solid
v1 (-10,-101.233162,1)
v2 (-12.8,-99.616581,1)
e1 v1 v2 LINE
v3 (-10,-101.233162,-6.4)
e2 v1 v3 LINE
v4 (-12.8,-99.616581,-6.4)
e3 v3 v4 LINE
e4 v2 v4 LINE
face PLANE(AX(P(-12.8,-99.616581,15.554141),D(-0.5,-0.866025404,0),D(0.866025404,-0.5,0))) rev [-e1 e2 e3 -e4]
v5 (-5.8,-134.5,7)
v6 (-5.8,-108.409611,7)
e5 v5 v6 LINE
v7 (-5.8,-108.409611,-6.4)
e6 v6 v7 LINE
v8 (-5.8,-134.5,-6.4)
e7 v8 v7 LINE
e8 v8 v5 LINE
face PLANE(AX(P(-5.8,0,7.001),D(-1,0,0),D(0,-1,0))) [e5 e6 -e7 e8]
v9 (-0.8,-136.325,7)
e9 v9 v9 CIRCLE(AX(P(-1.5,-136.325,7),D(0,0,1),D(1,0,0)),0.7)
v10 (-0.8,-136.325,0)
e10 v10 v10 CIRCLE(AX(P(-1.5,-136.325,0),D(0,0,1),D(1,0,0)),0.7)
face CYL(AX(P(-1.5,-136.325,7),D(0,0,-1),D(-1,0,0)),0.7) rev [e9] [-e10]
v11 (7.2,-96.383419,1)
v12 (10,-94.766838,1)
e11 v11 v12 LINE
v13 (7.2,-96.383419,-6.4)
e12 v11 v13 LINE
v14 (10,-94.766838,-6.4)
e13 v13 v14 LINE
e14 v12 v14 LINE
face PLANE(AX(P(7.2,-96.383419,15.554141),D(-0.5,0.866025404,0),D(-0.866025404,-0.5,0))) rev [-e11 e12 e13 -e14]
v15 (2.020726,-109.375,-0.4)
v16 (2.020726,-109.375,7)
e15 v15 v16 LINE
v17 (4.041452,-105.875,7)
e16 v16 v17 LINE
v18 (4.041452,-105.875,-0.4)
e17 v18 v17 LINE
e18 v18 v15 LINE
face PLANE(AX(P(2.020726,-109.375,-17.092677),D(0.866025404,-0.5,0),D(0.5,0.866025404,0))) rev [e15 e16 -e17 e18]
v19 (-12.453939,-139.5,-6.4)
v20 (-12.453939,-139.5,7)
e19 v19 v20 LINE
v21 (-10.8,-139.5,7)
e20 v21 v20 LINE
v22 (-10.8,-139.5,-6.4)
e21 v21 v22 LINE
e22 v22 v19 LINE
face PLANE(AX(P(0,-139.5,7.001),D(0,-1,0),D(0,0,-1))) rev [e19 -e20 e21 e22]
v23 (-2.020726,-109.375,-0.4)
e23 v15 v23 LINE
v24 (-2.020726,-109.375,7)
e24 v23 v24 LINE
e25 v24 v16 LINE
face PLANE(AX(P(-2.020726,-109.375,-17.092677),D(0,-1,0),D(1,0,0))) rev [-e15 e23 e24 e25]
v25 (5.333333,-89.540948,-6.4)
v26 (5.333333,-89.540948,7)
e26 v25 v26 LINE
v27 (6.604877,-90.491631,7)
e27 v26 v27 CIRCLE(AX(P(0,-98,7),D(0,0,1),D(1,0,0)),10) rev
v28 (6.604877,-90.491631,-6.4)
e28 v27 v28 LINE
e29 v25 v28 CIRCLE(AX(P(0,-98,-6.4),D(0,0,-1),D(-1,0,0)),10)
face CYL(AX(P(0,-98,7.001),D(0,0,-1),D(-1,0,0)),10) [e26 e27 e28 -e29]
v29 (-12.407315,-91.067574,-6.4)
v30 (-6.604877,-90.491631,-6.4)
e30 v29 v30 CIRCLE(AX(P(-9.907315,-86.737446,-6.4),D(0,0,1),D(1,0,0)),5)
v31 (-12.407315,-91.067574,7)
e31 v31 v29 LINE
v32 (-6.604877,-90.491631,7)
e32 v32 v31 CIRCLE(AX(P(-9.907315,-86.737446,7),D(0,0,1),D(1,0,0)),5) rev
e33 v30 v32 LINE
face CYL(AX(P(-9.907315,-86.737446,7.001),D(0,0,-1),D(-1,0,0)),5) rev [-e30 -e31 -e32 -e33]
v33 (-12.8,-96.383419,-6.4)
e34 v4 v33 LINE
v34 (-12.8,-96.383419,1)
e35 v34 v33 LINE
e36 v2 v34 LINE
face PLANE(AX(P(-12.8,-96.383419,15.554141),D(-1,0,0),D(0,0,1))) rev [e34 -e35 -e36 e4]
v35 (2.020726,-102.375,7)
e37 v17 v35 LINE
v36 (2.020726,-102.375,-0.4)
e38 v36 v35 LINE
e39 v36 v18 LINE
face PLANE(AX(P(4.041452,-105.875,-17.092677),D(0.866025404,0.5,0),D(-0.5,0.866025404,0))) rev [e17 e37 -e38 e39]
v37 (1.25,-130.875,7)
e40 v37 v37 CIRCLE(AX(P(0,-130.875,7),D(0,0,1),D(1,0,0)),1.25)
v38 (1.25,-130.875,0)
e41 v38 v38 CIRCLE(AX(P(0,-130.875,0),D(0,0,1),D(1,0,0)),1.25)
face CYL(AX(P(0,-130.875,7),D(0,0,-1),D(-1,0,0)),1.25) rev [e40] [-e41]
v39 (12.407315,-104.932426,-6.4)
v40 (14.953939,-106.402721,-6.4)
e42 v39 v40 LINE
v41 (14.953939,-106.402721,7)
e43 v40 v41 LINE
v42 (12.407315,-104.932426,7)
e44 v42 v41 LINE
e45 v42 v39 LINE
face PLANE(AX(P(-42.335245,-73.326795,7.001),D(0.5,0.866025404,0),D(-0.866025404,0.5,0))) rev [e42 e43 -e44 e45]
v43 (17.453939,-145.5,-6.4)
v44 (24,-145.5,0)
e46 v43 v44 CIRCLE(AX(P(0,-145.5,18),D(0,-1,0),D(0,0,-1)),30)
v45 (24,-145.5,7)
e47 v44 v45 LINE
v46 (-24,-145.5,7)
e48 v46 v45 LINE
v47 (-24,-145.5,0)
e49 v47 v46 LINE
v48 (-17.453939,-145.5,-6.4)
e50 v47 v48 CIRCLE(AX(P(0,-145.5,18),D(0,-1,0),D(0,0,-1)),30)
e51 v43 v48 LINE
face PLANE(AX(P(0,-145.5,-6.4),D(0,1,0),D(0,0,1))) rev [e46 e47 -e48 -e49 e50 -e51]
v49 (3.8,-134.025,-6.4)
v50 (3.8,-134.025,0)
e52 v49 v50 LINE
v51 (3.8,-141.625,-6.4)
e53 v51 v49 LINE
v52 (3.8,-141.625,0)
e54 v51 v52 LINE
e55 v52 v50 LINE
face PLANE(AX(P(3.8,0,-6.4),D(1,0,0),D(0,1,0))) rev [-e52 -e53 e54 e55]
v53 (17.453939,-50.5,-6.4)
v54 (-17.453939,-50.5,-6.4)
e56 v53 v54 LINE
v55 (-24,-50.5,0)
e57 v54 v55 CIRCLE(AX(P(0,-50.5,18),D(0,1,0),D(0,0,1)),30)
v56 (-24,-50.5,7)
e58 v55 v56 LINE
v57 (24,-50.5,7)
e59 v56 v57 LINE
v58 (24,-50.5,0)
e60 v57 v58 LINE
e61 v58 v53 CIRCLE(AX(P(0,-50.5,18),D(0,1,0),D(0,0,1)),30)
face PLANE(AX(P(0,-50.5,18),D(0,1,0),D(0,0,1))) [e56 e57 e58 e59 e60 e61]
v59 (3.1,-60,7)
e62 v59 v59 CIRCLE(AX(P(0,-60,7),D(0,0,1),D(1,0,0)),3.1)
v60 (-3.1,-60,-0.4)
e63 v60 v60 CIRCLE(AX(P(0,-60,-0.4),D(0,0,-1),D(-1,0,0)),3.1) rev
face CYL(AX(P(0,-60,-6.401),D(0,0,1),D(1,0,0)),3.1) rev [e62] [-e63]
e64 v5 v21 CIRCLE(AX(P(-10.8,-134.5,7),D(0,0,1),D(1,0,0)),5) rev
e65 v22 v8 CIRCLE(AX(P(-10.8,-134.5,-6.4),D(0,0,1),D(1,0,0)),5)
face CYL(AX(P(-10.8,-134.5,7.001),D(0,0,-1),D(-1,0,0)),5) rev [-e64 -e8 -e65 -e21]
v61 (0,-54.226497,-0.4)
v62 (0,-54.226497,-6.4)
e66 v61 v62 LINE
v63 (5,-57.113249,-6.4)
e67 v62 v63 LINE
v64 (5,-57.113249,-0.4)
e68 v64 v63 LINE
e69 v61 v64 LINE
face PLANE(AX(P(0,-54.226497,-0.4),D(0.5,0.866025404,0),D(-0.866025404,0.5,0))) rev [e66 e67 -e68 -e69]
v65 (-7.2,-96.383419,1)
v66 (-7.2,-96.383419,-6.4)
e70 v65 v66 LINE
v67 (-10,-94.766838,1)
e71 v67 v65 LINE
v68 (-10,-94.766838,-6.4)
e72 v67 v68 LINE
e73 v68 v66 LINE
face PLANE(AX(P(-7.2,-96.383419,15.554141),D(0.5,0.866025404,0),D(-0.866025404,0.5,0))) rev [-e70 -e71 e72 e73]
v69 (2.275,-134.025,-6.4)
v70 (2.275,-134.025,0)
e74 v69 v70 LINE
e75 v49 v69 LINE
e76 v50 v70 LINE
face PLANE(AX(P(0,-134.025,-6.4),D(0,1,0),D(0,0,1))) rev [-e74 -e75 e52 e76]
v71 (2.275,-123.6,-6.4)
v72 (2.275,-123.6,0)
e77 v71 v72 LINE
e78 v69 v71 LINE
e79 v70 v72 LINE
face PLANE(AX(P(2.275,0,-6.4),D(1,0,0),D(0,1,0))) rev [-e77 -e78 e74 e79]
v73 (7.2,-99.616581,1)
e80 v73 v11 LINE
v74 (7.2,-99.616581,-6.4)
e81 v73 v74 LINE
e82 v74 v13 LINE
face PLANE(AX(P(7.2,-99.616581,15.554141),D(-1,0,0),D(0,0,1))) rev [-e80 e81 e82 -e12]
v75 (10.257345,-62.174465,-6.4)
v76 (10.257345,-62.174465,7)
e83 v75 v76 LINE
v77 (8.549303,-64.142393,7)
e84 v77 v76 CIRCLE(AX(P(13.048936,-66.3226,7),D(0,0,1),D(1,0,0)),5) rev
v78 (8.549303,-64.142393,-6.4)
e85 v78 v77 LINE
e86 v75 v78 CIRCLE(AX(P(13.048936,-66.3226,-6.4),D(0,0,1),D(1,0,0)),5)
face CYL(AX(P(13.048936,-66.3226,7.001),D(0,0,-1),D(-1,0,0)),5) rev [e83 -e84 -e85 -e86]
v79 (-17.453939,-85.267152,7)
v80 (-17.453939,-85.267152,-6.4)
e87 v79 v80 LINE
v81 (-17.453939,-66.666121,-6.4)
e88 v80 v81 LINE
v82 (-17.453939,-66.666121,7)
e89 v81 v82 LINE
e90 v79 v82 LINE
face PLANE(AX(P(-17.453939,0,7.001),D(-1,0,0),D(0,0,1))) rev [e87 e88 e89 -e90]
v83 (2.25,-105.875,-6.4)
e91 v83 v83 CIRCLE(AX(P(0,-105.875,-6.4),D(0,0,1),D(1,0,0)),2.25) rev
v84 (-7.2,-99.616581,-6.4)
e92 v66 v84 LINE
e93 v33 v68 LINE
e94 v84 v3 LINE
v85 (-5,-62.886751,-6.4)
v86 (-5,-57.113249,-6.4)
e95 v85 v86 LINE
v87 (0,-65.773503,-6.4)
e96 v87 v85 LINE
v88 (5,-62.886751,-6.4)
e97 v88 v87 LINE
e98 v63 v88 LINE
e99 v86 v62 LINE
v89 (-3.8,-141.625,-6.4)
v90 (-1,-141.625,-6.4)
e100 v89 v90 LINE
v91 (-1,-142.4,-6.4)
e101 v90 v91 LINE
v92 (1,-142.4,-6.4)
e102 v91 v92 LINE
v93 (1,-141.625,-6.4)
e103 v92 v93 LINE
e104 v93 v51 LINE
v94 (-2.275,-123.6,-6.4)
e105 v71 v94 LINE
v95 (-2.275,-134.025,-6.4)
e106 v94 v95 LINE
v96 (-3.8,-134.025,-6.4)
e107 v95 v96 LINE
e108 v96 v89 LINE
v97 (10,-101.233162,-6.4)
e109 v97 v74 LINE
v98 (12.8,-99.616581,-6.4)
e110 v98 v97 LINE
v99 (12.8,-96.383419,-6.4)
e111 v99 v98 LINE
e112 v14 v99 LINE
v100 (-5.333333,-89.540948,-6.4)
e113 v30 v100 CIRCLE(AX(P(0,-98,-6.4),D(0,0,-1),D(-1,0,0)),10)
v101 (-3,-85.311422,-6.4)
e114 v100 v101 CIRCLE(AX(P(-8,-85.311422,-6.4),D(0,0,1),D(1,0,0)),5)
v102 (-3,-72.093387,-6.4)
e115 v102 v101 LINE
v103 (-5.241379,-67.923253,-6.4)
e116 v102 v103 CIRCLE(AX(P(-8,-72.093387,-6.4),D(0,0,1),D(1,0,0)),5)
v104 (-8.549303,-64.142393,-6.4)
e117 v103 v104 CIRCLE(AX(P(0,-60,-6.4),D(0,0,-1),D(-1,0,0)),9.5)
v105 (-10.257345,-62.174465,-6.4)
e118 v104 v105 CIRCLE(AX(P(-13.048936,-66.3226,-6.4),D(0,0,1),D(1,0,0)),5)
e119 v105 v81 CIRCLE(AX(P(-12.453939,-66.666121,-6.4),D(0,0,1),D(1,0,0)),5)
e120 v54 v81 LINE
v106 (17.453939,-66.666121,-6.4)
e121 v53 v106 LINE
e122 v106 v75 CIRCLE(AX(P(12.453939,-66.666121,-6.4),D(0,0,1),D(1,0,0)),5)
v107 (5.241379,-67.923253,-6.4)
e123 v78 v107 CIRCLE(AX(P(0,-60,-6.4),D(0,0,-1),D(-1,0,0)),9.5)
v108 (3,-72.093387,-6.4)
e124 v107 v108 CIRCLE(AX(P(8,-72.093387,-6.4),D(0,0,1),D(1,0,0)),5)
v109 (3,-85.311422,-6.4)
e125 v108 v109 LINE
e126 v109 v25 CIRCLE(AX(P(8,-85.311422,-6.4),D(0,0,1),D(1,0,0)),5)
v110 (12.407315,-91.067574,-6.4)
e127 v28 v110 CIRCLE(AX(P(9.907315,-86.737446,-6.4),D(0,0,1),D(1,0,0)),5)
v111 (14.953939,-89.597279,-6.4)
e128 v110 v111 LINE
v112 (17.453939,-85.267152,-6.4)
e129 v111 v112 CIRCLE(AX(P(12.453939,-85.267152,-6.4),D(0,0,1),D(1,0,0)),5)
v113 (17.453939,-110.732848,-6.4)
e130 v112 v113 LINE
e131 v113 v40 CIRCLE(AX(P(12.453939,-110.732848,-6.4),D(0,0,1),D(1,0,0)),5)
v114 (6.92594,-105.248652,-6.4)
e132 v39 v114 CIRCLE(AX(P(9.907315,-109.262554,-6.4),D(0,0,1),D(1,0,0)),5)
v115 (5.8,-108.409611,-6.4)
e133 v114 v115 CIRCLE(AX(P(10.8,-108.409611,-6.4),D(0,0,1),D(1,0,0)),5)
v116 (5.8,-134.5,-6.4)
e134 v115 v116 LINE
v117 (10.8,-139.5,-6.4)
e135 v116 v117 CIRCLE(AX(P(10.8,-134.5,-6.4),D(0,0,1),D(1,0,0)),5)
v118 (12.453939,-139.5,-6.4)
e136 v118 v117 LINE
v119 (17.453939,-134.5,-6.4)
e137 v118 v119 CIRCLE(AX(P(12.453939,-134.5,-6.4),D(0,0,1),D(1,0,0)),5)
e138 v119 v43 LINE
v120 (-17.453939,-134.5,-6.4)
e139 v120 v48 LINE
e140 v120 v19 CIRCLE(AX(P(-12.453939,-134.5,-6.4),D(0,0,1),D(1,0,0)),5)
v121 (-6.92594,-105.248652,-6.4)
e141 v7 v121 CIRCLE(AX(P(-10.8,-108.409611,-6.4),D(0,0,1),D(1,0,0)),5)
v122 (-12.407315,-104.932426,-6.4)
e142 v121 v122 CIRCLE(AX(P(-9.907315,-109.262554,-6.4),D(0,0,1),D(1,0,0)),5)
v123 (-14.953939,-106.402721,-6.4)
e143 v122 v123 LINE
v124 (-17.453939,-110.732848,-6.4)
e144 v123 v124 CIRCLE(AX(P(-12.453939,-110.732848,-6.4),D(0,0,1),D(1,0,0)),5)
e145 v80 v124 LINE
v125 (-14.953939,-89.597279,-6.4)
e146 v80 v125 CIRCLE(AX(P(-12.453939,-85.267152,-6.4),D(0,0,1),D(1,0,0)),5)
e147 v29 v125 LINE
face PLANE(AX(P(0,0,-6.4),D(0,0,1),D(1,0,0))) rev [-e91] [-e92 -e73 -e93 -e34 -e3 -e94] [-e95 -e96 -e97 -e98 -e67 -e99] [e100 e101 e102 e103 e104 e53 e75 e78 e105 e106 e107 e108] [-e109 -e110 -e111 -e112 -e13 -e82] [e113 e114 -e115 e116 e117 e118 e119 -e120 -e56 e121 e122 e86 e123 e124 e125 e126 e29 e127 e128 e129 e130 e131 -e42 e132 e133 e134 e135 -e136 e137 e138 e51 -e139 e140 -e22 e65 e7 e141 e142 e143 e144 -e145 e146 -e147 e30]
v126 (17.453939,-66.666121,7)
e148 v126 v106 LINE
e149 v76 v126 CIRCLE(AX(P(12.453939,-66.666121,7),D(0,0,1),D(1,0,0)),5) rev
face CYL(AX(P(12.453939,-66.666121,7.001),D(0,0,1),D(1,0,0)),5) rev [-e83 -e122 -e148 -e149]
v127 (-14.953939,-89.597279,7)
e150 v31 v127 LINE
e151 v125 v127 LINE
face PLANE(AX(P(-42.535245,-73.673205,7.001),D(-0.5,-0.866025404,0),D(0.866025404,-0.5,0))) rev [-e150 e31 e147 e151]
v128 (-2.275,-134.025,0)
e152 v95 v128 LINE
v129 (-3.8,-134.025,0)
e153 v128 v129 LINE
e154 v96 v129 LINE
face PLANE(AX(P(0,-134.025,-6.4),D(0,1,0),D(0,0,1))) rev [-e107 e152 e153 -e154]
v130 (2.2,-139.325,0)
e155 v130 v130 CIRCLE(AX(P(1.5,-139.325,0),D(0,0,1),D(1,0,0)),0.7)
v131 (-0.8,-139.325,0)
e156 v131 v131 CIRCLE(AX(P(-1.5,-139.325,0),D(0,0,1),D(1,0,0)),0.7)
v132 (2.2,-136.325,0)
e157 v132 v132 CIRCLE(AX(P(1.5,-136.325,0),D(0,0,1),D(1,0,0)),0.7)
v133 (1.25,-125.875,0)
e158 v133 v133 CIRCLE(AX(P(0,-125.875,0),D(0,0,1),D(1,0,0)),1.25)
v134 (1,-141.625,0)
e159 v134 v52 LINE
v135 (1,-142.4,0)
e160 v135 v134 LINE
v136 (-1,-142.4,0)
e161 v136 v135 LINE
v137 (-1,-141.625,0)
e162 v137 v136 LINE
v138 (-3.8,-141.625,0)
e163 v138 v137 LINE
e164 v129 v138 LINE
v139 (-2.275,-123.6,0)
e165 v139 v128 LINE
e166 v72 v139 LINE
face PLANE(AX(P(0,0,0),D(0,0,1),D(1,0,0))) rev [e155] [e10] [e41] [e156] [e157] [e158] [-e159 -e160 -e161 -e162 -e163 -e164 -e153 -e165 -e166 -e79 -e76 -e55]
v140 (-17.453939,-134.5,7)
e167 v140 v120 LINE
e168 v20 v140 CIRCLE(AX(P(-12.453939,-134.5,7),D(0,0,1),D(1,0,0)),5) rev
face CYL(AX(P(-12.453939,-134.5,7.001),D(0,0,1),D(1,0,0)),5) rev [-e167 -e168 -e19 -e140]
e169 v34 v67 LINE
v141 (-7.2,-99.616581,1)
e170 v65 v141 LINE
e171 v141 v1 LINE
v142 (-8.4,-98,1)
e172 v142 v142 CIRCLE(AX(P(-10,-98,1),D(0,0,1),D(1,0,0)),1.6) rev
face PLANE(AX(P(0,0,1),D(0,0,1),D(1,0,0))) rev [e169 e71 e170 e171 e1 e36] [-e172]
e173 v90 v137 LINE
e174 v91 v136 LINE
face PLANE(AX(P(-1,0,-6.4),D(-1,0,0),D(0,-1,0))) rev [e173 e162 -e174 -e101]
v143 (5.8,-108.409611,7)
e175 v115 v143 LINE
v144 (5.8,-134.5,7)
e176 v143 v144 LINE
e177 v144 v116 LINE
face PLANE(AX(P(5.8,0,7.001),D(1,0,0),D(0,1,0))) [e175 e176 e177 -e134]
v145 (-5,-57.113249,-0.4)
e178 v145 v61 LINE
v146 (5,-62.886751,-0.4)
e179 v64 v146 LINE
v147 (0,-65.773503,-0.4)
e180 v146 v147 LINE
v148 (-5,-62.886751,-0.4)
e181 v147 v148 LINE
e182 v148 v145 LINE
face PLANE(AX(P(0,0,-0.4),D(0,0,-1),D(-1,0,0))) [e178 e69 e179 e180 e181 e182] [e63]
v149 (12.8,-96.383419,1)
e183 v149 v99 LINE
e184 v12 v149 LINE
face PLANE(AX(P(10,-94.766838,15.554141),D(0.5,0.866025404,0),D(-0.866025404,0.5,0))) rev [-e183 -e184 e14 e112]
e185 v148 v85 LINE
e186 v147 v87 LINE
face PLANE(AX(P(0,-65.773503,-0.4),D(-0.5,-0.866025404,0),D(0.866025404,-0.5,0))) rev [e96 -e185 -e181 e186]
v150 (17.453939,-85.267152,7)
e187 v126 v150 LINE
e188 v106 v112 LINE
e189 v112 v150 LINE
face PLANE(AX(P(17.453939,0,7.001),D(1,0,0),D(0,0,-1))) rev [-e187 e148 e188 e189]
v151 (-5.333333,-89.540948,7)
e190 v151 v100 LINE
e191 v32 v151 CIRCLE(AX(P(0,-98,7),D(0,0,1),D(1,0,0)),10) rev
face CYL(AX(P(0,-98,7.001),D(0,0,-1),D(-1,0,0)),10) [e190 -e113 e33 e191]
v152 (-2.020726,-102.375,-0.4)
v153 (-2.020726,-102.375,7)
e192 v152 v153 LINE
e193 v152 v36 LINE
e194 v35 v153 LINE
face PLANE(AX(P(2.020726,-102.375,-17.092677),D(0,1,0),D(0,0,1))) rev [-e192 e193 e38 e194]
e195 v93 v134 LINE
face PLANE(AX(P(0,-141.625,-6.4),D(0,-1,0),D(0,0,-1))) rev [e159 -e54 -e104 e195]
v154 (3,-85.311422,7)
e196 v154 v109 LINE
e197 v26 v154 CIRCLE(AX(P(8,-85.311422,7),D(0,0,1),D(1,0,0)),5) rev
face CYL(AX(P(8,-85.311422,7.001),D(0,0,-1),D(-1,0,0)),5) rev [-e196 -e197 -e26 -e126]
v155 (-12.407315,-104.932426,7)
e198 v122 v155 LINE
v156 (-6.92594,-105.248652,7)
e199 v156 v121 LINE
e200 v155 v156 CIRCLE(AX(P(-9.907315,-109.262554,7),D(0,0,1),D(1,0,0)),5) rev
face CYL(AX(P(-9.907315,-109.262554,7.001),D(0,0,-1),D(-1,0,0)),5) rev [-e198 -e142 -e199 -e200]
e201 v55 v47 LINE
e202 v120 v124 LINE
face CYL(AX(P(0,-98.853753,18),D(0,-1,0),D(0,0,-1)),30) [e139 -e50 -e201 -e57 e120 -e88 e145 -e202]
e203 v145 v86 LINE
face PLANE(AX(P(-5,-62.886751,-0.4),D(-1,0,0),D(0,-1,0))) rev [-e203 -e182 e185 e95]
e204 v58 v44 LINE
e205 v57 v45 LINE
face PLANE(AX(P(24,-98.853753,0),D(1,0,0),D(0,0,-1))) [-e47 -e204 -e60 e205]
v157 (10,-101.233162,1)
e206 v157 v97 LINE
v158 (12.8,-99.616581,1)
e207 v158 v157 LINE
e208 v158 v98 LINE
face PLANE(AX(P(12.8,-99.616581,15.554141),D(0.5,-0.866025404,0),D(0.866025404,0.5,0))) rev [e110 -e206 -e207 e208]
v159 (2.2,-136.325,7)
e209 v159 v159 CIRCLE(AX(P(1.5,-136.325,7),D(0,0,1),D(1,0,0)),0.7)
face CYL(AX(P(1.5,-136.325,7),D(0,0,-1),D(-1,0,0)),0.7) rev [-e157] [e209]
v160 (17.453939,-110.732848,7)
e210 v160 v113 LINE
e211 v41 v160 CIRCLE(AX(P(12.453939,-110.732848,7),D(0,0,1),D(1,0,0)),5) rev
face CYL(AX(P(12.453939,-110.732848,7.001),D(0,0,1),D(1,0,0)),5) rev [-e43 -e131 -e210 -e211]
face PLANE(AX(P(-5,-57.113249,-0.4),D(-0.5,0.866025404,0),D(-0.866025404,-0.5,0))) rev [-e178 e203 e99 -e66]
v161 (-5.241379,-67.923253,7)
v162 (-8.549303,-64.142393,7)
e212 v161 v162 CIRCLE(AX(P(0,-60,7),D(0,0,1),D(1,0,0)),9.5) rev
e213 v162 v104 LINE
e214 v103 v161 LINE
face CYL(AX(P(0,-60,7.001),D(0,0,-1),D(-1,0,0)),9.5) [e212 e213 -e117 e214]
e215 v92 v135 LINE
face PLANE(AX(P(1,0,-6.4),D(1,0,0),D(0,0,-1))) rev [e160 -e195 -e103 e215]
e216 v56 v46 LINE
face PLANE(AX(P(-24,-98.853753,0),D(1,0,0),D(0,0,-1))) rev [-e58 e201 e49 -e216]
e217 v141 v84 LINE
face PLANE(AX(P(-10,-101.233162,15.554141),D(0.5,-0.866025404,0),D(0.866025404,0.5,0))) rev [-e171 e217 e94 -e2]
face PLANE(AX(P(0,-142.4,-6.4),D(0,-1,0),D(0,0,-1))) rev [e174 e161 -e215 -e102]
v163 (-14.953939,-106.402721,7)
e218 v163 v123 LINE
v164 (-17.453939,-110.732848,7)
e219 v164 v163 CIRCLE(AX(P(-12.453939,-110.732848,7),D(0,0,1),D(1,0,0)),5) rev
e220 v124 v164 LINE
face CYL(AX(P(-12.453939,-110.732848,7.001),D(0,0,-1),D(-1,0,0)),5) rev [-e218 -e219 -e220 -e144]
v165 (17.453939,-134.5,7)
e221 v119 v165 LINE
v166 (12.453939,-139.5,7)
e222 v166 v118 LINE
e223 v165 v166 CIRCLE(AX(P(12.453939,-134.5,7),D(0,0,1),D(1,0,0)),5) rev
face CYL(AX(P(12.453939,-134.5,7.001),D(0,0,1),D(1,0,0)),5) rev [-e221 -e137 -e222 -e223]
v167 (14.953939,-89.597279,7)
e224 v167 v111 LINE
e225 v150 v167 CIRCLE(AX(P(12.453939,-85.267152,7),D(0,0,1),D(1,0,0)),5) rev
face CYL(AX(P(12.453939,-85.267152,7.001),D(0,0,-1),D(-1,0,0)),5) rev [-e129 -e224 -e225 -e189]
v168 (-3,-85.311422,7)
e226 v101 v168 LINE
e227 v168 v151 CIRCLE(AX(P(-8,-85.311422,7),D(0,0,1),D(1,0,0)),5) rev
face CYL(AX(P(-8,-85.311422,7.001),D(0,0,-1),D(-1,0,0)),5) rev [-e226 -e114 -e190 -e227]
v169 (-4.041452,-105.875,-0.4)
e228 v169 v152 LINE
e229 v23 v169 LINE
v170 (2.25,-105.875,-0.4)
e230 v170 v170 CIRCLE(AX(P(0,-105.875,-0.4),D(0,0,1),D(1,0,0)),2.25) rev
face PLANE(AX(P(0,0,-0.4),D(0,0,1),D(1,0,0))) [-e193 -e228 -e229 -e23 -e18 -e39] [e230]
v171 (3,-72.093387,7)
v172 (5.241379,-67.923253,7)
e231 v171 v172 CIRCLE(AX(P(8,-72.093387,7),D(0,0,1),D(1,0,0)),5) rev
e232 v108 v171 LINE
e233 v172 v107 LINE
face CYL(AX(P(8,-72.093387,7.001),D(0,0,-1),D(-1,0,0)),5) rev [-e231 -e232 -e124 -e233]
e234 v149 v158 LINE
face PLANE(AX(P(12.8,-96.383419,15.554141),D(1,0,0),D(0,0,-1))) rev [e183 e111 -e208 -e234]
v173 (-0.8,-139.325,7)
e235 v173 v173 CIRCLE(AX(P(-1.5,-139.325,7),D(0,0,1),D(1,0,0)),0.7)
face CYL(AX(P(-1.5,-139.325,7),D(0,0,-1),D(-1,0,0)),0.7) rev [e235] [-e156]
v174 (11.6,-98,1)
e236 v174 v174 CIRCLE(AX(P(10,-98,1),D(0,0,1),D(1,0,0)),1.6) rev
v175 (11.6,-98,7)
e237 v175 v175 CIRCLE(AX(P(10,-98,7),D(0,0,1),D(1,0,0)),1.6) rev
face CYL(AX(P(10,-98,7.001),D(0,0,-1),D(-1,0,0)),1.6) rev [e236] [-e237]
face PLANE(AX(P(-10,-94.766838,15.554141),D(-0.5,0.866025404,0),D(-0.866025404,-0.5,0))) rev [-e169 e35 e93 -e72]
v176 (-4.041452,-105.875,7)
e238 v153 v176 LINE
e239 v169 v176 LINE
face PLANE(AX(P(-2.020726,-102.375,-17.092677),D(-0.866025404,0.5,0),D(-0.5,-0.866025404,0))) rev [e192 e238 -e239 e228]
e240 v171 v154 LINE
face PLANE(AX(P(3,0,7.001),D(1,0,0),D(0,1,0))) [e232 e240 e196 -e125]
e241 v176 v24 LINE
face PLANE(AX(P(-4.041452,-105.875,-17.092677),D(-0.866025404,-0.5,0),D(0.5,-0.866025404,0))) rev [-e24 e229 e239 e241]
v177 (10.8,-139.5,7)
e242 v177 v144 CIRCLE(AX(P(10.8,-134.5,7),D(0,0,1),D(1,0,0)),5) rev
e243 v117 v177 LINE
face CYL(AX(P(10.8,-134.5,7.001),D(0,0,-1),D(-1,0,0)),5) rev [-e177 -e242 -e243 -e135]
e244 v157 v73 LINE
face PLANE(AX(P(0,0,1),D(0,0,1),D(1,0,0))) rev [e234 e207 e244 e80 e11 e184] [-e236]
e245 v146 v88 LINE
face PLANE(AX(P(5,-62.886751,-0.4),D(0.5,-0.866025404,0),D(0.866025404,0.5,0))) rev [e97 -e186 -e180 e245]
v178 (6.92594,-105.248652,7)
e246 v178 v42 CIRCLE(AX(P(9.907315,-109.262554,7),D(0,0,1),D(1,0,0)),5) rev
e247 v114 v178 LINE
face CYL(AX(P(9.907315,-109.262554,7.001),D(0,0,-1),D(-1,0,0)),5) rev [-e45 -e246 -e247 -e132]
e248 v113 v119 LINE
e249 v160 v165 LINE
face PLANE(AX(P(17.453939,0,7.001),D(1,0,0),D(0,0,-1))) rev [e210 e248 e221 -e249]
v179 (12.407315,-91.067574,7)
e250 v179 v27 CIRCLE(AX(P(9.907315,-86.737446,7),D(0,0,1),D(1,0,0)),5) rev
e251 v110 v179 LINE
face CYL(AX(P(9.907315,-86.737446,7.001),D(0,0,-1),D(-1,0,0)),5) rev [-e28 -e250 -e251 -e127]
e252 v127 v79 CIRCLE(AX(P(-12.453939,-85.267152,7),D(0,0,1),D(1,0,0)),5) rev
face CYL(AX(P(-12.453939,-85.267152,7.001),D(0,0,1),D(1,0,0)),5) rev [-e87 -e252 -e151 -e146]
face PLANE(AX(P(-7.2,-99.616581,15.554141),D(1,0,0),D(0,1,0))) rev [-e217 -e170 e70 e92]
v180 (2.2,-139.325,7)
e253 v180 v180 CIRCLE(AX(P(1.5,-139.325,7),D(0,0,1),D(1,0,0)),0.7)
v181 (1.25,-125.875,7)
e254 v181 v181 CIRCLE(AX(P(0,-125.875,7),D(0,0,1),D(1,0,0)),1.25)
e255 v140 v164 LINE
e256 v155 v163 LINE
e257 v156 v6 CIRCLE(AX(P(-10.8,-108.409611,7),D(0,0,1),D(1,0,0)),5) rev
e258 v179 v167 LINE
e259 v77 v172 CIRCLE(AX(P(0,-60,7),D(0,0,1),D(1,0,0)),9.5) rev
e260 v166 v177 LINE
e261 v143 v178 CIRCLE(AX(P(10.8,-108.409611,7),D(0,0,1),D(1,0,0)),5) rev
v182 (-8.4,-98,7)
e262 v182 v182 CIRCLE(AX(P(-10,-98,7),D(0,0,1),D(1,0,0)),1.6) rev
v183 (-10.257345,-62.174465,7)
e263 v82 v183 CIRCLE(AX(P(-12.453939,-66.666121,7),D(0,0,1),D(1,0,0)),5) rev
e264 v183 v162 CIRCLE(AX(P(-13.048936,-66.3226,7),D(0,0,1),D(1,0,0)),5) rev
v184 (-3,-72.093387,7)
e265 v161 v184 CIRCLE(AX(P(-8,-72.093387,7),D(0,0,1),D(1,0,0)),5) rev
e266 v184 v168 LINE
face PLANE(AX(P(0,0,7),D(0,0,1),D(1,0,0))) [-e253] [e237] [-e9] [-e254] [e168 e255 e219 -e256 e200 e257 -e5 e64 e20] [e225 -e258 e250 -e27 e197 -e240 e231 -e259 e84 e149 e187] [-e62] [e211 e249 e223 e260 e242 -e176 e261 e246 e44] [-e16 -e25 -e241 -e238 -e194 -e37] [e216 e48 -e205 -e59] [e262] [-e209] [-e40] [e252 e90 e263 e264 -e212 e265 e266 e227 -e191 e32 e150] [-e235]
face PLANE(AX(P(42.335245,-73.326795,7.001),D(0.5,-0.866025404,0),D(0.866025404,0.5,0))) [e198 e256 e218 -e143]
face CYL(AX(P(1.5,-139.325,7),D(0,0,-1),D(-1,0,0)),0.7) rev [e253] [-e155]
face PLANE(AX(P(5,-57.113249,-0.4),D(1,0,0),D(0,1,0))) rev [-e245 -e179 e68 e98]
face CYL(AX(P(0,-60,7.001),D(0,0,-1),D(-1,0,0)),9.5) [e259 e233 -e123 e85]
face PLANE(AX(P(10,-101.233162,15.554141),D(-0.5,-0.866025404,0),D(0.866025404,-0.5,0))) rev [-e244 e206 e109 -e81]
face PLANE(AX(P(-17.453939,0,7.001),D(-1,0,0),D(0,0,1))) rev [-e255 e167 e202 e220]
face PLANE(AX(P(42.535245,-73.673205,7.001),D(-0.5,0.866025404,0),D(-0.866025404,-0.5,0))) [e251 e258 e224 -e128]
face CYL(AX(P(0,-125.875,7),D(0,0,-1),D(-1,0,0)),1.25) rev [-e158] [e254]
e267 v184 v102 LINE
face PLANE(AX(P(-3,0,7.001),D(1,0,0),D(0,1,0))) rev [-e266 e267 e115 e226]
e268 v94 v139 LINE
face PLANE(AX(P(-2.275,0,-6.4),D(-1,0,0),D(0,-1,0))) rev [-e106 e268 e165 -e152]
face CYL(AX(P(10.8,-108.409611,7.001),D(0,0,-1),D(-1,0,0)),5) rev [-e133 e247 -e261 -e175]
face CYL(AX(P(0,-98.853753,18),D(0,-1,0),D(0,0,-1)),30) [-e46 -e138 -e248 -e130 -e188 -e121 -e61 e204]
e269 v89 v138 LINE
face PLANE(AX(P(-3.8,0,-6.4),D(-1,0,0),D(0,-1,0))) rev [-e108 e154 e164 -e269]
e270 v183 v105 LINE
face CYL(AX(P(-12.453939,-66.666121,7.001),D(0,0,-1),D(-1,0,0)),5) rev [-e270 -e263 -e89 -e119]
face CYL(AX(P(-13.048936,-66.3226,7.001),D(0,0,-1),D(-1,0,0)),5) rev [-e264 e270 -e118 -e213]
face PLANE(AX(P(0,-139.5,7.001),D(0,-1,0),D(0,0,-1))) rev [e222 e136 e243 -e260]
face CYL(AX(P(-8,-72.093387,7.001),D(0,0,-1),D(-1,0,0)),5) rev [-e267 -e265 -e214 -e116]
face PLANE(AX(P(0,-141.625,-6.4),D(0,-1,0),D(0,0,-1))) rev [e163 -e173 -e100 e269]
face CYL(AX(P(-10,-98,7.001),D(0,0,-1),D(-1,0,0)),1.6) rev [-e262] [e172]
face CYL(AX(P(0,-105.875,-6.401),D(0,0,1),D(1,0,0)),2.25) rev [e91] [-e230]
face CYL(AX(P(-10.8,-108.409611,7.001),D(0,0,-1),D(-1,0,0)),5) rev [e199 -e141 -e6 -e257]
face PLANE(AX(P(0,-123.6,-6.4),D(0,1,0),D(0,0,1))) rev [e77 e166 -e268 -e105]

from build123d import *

# Parameters (mm, degrees)
SKETCH1_W           = 14
SKETCH1_H           = 25
BOSS_EXTRUDE1_DEPTH = 6.4
SKETCH3_W           = 14
SKETCH3_H           = 25
SKETCH3_R           = 0.7
SKETCH3_R_2         = 1.25
BOSS_EXTRUDE3_DEPTH = 7
BOSS_EXTRUDE4_START = -25
BOSS_EXTRUDE4_DEPTH = 25
BOSS_EXTRUDE5_START = 70
BOSS_EXTRUDE5_DEPTH = 70
CUT_EXTRUDE1_REACH  = 150.074
SKETCH6_R           = 2.25
CUT_EXTRUDE2_DEPTH  = 7.4
CUT_EXTRUDE4_REACH  = 150.074
SKETCH9_R           = 1.6
CUT_EXTRUDE5_DEPTH  = 7.4
CUT_EXTRUDE6_REACH  = 150.074
SKETCH11_R          = 3.1
CUT_EXTRUDE7_DEPTH  = 6
CUT_EXTRUDE8_REACH  = 150.074
FILLET1_R           = 5


with BuildPart() as part:
    # Sketch1 → Boss-Extrude1 (new body)
    with BuildSketch(Plane.XY):
        with Locations((0, -133)):
            Rectangle(SKETCH1_W, SKETCH1_H)
        Polygon((-2.275, -128.6), (-2.275, -128.15), (-2.275, -123.6), (2.275, -123.6), (2.275, -128.15), (2.275, -128.6), (2.275, -133.15), (2.275, -134.025), (3.8, -134.025), (3.8, -141.625), (1, -141.625), (1, -142.4), (-1, -142.4), (-1, -141.625), (-3.8, -141.625), (-3.8, -134.025), (-2.275, -134.025), (-2.275, -133.15), align=None, mode=Mode.SUBTRACT)
    extrude(amount=-BOSS_EXTRUDE1_DEPTH)

    # Sketch3 → Boss-Extrude3 (add)
    with BuildSketch(Plane.XY):
        with Locations((0, -133)):
            Rectangle(SKETCH3_W, SKETCH3_H)
        with Locations((-1.5, -139.325)):
            Circle(SKETCH3_R, mode=Mode.SUBTRACT)
        with Locations((-1.5, -136.325)):
            Circle(SKETCH3_R, mode=Mode.SUBTRACT)
        with Locations((1.5, -136.325)):
            Circle(SKETCH3_R, mode=Mode.SUBTRACT)
        with Locations((1.5, -139.325)):
            Circle(SKETCH3_R, mode=Mode.SUBTRACT)
        with Locations((0, -130.875)):
            Circle(SKETCH3_R_2, mode=Mode.SUBTRACT)
        with Locations((0, -125.875)):
            Circle(SKETCH3_R_2, mode=Mode.SUBTRACT)
    extrude(amount=BOSS_EXTRUDE3_DEPTH)

    # Sketch4 → Boss-Extrude4 (add)
    with BuildSketch(Plane.XZ.offset(145.5).offset(BOSS_EXTRUDE4_START)):
        with BuildLine():
            Line((-17.453939383, -6.4), (-7, -6.4))
            Line((-7, -6.4), (-7, 7))
            Line((-7, 7), (-24, 7))
            Line((-24, 7), (-24, 0))
            ThreePointArc((-24, 0), (-20.972536151, -3.45117077), (-17.453939383, -6.4))
        make_face()
        with BuildLine():
            Line((7, 7), (7, -6.4))
            Line((7, -6.4), (17.453939383, -6.4))
            ThreePointArc((17.453939383, -6.4), (20.972536151, -3.45117077), (24, 0))
            Line((24, 0), (24, 7))
            Line((24, 7), (7, 7))
        make_face()
    extrude(amount=BOSS_EXTRUDE4_DEPTH)

    # Sketch5 → Boss-Extrude5 (add)
    with BuildSketch(Plane(origin=(0, -120.5, 0), x_dir=(1, 0, 0), z_dir=(0, 1, 0)).offset(BOSS_EXTRUDE5_START)):
        with BuildLine():
            Line((17.453939383, 6.4), (-17.453939383, 6.4))
            ThreePointArc((-17.453939383, 6.4), (-20.972536151, 3.45117077), (-24, 0))
            Line((-24, 0), (-24, -7))
            Line((-24, -7), (24, -7))
            Line((24, -7), (24, 0))
            ThreePointArc((24, 0), (20.972536151, 3.45117077), (17.453939383, 6.4))
        make_face()
    extrude(amount=-BOSS_EXTRUDE5_DEPTH)

    # Sketch6 → Cut-Extrude1 (cut, up to next)
    with BuildSketch(Plane.XY.offset(7), mode=Mode.PRIVATE) as cut_extrude1_sk1:
        with Locations((0, -105.875)):
            Circle(SKETCH6_R)
    cut_extrude1_tool1 = extrude(cut_extrude1_sk1.sketch, amount=-CUT_EXTRUDE1_REACH, mode=Mode.PRIVATE) & part.part
    add(cut_extrude1_tool1.solids().sort_by_distance((0, -105.875, 7))[0], mode=Mode.SUBTRACT)

    # Sketch7 → Cut-Extrude2 (cut)
    with BuildSketch(Plane.XY.offset(7)):
        Polygon((4.041451884, -105.875), (2.020725942, -102.375), (-2.020725942, -102.375), (-4.041451884, -105.875), (-2.020725942, -109.375), (2.020725942, -109.375), align=None)
    extrude(amount=-CUT_EXTRUDE2_DEPTH, mode=Mode.SUBTRACT)

    # Sketch9 → Cut-Extrude4 (cut, up to next)
    with BuildSketch(Plane(origin=(0, 0, -6.4), x_dir=(-1, 0, 0), z_dir=(0, 0, -1)), mode=Mode.PRIVATE) as cut_extrude4_sk1:
        with Locations((-10, -98)):
            Circle(SKETCH9_R)
    cut_extrude4_tool1 = extrude(cut_extrude4_sk1.sketch, amount=-CUT_EXTRUDE4_REACH, mode=Mode.PRIVATE) & part.part
    # Sketch9 → Cut-Extrude4 (cut, up to next)
    with BuildSketch(Plane(origin=(0, 0, -6.4), x_dir=(-1, 0, 0), z_dir=(0, 0, -1)), mode=Mode.PRIVATE) as cut_extrude4_sk2:
        with Locations(Location((10, -98, 0), (0, 0, 180))):
            Circle(SKETCH9_R)
    cut_extrude4_tool2 = extrude(cut_extrude4_sk2.sketch, amount=-CUT_EXTRUDE4_REACH, mode=Mode.PRIVATE) & part.part
    add(cut_extrude4_tool1.solids().sort_by_distance((10, -98, -6.4))[0], mode=Mode.SUBTRACT)
    add(cut_extrude4_tool2.solids().sort_by_distance((-10, -98, -6.4))[0], mode=Mode.SUBTRACT)

    # Sketch10 → Cut-Extrude5 (cut)
    with BuildSketch(Plane(origin=(0, 0, -6.4), x_dir=(-1, 0, 0), z_dir=(0, 0, -1))):
        Polygon((-10, -101.233161507), (-7.2, -99.616580754), (-7.2, -96.383419246), (-10, -94.766838493), (-12.8, -96.383419246), (-12.8, -99.616580754), align=None)
        Polygon((12.8, -99.616580754), (10, -101.233161507), (7.2, -99.616580754), (7.2, -96.383419246), (10, -94.766838493), (12.8, -96.383419246), align=None)
    extrude(amount=-CUT_EXTRUDE5_DEPTH, mode=Mode.SUBTRACT)

    # Sketch11 → Cut-Extrude6 (cut, up to next)
    with BuildSketch(Plane.XY.offset(7), mode=Mode.PRIVATE) as cut_extrude6_sk1:
        with Locations((0, -60)):
            Circle(SKETCH11_R)
    cut_extrude6_tool1 = extrude(cut_extrude6_sk1.sketch, amount=-CUT_EXTRUDE6_REACH, mode=Mode.PRIVATE) & part.part
    add(cut_extrude6_tool1.solids().sort_by_distance((0, -60, 7))[0], mode=Mode.SUBTRACT)

    # Sketch12 → Cut-Extrude7 (cut)
    with BuildSketch(Plane(origin=(0, 0, -6.4), x_dir=(-1, 0, 0), z_dir=(0, 0, -1))):
        Polygon((0, -54.226497308), (-5, -57.113248654), (-5, -62.886751346), (0, -65.773502692), (5, -62.886751346), (5, -57.113248654), align=None)
    extrude(amount=-CUT_EXTRUDE7_DEPTH, mode=Mode.SUBTRACT)

    # Sketch13 → Cut-Extrude8 (cut, up to next)
    with BuildSketch(Plane(origin=(0, 0, -6.4), x_dir=(-1, 0, 0), z_dir=(0, 0, -1)), mode=Mode.PRIVATE) as cut_extrude8_sk1:
        with BuildLine():
            ThreePointArc((-3, -69.013878189), (-6.772704576, -66.66186706), (-9.062148865, -62.850869682))
            Line((-9.062148865, -62.850869682), (-17.453939383, -58.005867167))
            Line((-17.453939383, -58.005867167), (-17.453939383, -88.153903506))
            Line((-17.453939383, -88.153903506), (-8.758521814, -93.174205181))
            ThreePointArc((-8.758521814, -93.174205181), (-6.334051503, -90.261796619), (-3, -88.460607986))
            Line((-3, -88.460607986), (-3, -69.013878189))
        make_face()
    cut_extrude8_tool1 = extrude(cut_extrude8_sk1.sketch, amount=-CUT_EXTRUDE8_REACH, mode=Mode.PRIVATE) & part.part
    # Sketch13 → Cut-Extrude8 (cut, up to next)
    with BuildSketch(Plane(origin=(0, 0, -6.4), x_dir=(-1, 0, 0), z_dir=(0, 0, -1)), mode=Mode.PRIVATE) as cut_extrude8_sk2:
        with BuildLine():
            ThreePointArc((9.062148865, -62.850869682), (6.772704576, -66.66186706), (3, -69.013878189))
            Line((3, -69.013878189), (3, -88.460607986))
            ThreePointArc((3, -88.460607986), (6.334051503, -90.261796619), (8.758521814, -93.174205181))
            Line((8.758521814, -93.174205181), (17.453939383, -88.153903506))
            Line((17.453939383, -88.153903506), (17.453939383, -58.005867167))
            Line((17.453939383, -58.005867167), (9.062148865, -62.850869682))
        make_face()
    cut_extrude8_tool2 = extrude(cut_extrude8_sk2.sketch, amount=-CUT_EXTRUDE8_REACH, mode=Mode.PRIVATE) & part.part
    # Sketch13 → Cut-Extrude8 (cut, up to next)
    with BuildSketch(Plane(origin=(0, 0, -6.4), x_dir=(-1, 0, 0), z_dir=(0, 0, -1)), mode=Mode.PRIVATE) as cut_extrude8_sk3:
        with BuildLine():
            Line((-8.758521814, -102.825794819), (-17.453939383, -107.846096494))
            Line((-17.453939383, -107.846096494), (-17.453939383, -139.5))
            Line((-17.453939383, -139.5), (-5.8, -139.5))
            Line((-5.8, -139.5), (-5.8, -106.146164742))
            ThreePointArc((-5.8, -106.146164742), (-7.466180647, -104.652529334), (-8.758521814, -102.825794819))
        make_face()
    cut_extrude8_tool3 = extrude(cut_extrude8_sk3.sketch, amount=-CUT_EXTRUDE8_REACH, mode=Mode.PRIVATE) & part.part
    # Sketch13 → Cut-Extrude8 (cut, up to next)
    with BuildSketch(Plane(origin=(0, 0, -6.4), x_dir=(-1, 0, 0), z_dir=(0, 0, -1)), mode=Mode.PRIVATE) as cut_extrude8_sk4:
        with BuildLine():
            Line((17.453939383, -139.5), (17.453939383, -107.846096494))
            Line((17.453939383, -107.846096494), (8.758521814, -102.825794819))
            ThreePointArc((8.758521814, -102.825794819), (7.466180647, -104.652529334), (5.8, -106.146164742))
            Line((5.8, -106.146164742), (5.8, -139.5))
            Line((5.8, -139.5), (17.453939383, -139.5))
        make_face()
    cut_extrude8_tool4 = extrude(cut_extrude8_sk4.sketch, amount=-CUT_EXTRUDE8_REACH, mode=Mode.PRIVATE) & part.part
    add(cut_extrude8_tool1.solids().sort_by_distance((10.742167, -76.622969, -6.4))[0], mode=Mode.SUBTRACT)
    add(cut_extrude8_tool2.solids().sort_by_distance((-10.742167, -76.622969, -6.4))[0], mode=Mode.SUBTRACT)
    add(cut_extrude8_tool3.solids().sort_by_distance((11.534541, -122.314901, -6.4))[0], mode=Mode.SUBTRACT)
    add(cut_extrude8_tool4.solids().sort_by_distance((-11.534541, -122.314901, -6.4))[0], mode=Mode.SUBTRACT)

    # Fillet1
    # the kernel refuses this fillet: 5 mm, written as the material it adds along each edge
    with BuildSketch(Plane(origin=(5.8, -106.146164742, -6.4), x_dir=(0.7575363701838295, 0.6527929594049773, 0), z_dir=(0, 0, 1))) as fillet1_piece_1:
        with BuildLine():
            CenterArc((2.310120106, -4.978607617), FILLET1_R, 95.301968899, 43.945519562)
            Line((-1.477561745, -1.71464282), (0, 0))
            ThreePointArc((0, 0), (0.924048043, -0.042784766), (1.848096085, 0))
        make_face()
    extrude(amount=13.4)
    with BuildSketch(Plane(origin=(8.758521814, -102.825794819, -6.4), x_dir=(-0.62603870678312, -0.7797919835503048, 0), z_dir=(0, 0, 1))) as fillet1_piece_2:
        with BuildLine():
            CenterArc((4.300143888, 4.925479723), FILLET1_R, 188.758466443, 71.337075115)
            Line((-0.641551216, 4.164132563), (0, 0))
            ThreePointArc((0, 0), (1.720057555, 0.149040554), (3.440115111, 0))
        make_face()
    extrude(amount=13.4)
    with BuildSketch(Plane(origin=(17.453939383, -107.846096494, -6.4), x_dir=(0, -1, 0), z_dir=(0, 0, 1))) as fillet1_piece_3_section:
        with BuildLine():
            CenterArc((FILLET1_R * 0.57735026919, -FILLET1_R), FILLET1_R, 90, 60)
            Line((-FILLET1_R * 0.288675134595, -FILLET1_R * 0.5), (0, 0))
            Line((0, 0), (FILLET1_R * 0.57735026919, 0))
        make_face()
    fillet1_piece_3 = extrude(amount=13.4, mode=Mode.PRIVATE)
    fillet1_piece_3 = fillet1_piece_3 & Plane(origin=(0, -108.158373371, 18), x_dir=(0.5817979794472398, 0, -0.8133333333333321), z_dir=(0, 1, 0)) * Cylinder(30, 39, mode=Mode.PRIVATE)
    add(fillet1_piece_3)
    with BuildSketch(Plane(origin=(17.453939383, -139.5, -6.4), x_dir=(0, 1, 0), z_dir=(0, 0, 1))) as fillet1_piece_4_section:
        with BuildLine():
            CenterArc((FILLET1_R, FILLET1_R), FILLET1_R, 180, 90)
            Line((0, FILLET1_R), (0, 0))
            Line((0, 0), (FILLET1_R, 0))
        make_face()
    fillet1_piece_4 = extrude(amount=13.4, mode=Mode.PRIVATE)
    fillet1_piece_4 = fillet1_piece_4 & Plane(origin=(0, -138.368306739, 18), x_dir=(0.5817979794472398, 0, -0.8133333333333321), z_dir=(0, 1, 0)) * Cylinder(30, 47, mode=Mode.PRIVATE)
    add(fillet1_piece_4)
    with BuildSketch(Plane(origin=(5.8, -139.5, -6.4), x_dir=(0, 1, 0), z_dir=(0, 0, 1)), Plane(origin=(-5.8, -139.5, -6.4), x_dir=(-1, 0, 0), z_dir=(0, 0, 1))) as fillet1_piece_5:
        with BuildLine():
            CenterArc((FILLET1_R, -FILLET1_R), FILLET1_R, 90, 90)
            Line((0, -FILLET1_R), (0, 0))
            Line((0, 0), (FILLET1_R, 0))
        make_face()
    extrude(amount=13.4)
    with BuildSketch(Plane(origin=(-17.453939383, -139.5, -6.4), x_dir=(0, 1, 0), z_dir=(0, 0, 1))) as fillet1_piece_6_section:
        with BuildLine():
            CenterArc((FILLET1_R, -FILLET1_R), FILLET1_R, 90, 90)
            Line((0, -FILLET1_R), (0, 0))
            Line((0, 0), (FILLET1_R, 0))
        make_face()
    fillet1_piece_6 = extrude(amount=13.4, mode=Mode.PRIVATE)
    fillet1_piece_6 = fillet1_piece_6 & Plane(origin=(0, -138.368306739, 18), x_dir=(-0.799999999999999, 0, -0.6000000000000013), z_dir=(0, 1, 0)) * Cylinder(30, 47, mode=Mode.PRIVATE)
    add(fillet1_piece_6)
    with BuildSketch(Plane(origin=(-5.8, -106.146164742, -6.4), x_dir=(-0.7575363701838297, 0.6527929594049768, 0), z_dir=(0, 0, 1))) as fillet1_piece_7:
        with BuildLine():
            CenterArc((2.310120106, 4.978607617), FILLET1_R, 220.752511538, 43.945519562)
            Line((-1.477561745, 1.71464282), (0, 0))
            ThreePointArc((0, 0), (0.924048043, 0.042784766), (1.848096085, 0))
        make_face()
    extrude(amount=13.4)
    with BuildSketch(Plane(origin=(-8.758521814, -102.825794819, -6.4), x_dir=(0.6260387067831015, -0.7797919835503196, 0), z_dir=(0, 0, 1)), Plane(origin=(8.758521814, -93.174205181, -6.4), x_dir=(-0.6260387067831222, 0.779791983550303, 0), z_dir=(0, 0, 1))) as fillet1_piece_8:
        with BuildLine():
            CenterArc((4.300143888, -4.925479723), FILLET1_R, 99.904458442, 71.337075115)
            Line((-0.641551216, -4.164132563), (0, 0))
            ThreePointArc((0, 0), (1.720057555, -0.149040554), (3.440115111, 0))
        make_face()
    extrude(amount=13.4)
    with BuildSketch(Plane(origin=(-17.453939383, -107.846096494, -6.4), x_dir=(0.8660254037844315, 0.5000000000000123, 0), z_dir=(0, 0, 1))) as fillet1_piece_9_section:
        with BuildLine():
            CenterArc((FILLET1_R * 0.57735026919, -FILLET1_R), FILLET1_R, 90, 60)
            Line((-FILLET1_R * 0.288675134595, -FILLET1_R * 0.5), (0, 0))
            Line((0, 0), (FILLET1_R * 0.57735026919, 0))
        make_face()
    fillet1_piece_9 = extrude(amount=13.4, mode=Mode.PRIVATE)
    fillet1_piece_9 = fillet1_piece_9 & Plane(origin=(0, -108.158373371, 18), x_dir=(-0.799999999999999, 0, -0.6000000000000013), z_dir=(0, 1, 0)) * Cylinder(30, 39, mode=Mode.PRIVATE)
    add(fillet1_piece_9)
    with BuildSketch(Plane(origin=(-17.453939383, -58.005867167, -6.4), x_dir=(0.8660254037844394, -0.49999999999999867, 0), z_dir=(0, 0, 1))) as fillet1_piece_10_section:
        with BuildLine():
            CenterArc((FILLET1_R * 1.73205080757, -FILLET1_R), FILLET1_R, 90, 120)
            Line((FILLET1_R * 0.866025403784, -FILLET1_R * 1.5), (0, 0))
            Line((0, 0), (FILLET1_R * 1.73205080757, 0))
        make_face()
    fillet1_piece_10 = extrude(amount=13.4, mode=Mode.PRIVATE)
    fillet1_piece_10 = fillet1_piece_10 & Plane(origin=(0, -61.191165079, 18), x_dir=(-0.799999999999999, 0, -0.6000000000000013), z_dir=(0, 1, 0)) * Cylinder(30, 62, mode=Mode.PRIVATE)
    add(fillet1_piece_10)
    with BuildSketch(Plane(origin=(-17.453939383, -88.153903506, -6.4), x_dir=(0, 1, 0), z_dir=(0, 0, 1))) as fillet1_piece_11_section:
        with BuildLine():
            CenterArc((FILLET1_R * 0.57735026919, -FILLET1_R), FILLET1_R, 90, 60)
            Line((-FILLET1_R * 0.288675134595, -FILLET1_R * 0.5), (0, 0))
            Line((0, 0), (FILLET1_R * 0.57735026919, 0))
        make_face()
    fillet1_piece_11 = extrude(amount=13.4, mode=Mode.PRIVATE)
    fillet1_piece_11 = fillet1_piece_11 & Plane(origin=(0, -87.841626629, 18), x_dir=(-0.799999999999999, 0, -0.6000000000000013), z_dir=(0, 1, 0)) * Cylinder(30, 39, mode=Mode.PRIVATE)
    add(fillet1_piece_11)
    with BuildSketch(Plane(origin=(-8.758521814, -93.174205181, -6.4), x_dir=(-0.8660254037844435, 0.49999999999999156, 0), z_dir=(0, 0, 1))) as fillet1_piece_12:
        with BuildLine():
            CenterArc((4.213263339, -5), FILLET1_R, 90, 71.337075115)
            ThreePointArc((-0.523824374, -3.4), (-0.114609592, -1.722694321), (0, 0))
            Line((0, 0), (4.213263339, 0))
        make_face()
    extrude(amount=13.4)
    with BuildSketch(Plane(origin=(-3, -88.460607986, -6.4), x_dir=(-0.9074530571155881, -0.42015348282689874, 0), z_dir=(0, 0, 1))) as fillet1_piece_13:
        with BuildLine():
            CenterArc((3.214124019, -4.958505447), FILLET1_R, 97.386674756, 57.769047364)
            Line((-1.323141267, -2.857738033), (0, 0))
            ThreePointArc((0, 0), (1.285649607, -0.082989105), (2.571299215, 0))
        make_face()
    extrude(amount=13.4)
    with BuildSketch(Plane(origin=(17.453939383, -88.153903506, -6.4), x_dir=(0, 1, 0), z_dir=(0, 0, 1))) as fillet1_piece_14_section:
        with BuildLine():
            CenterArc((FILLET1_R * 0.57735026919, FILLET1_R), FILLET1_R, 210, 60)
            Line((-FILLET1_R * 0.288675134595, FILLET1_R * 0.5), (0, 0))
            Line((0, 0), (FILLET1_R * 0.57735026919, 0))
        make_face()
    fillet1_piece_14 = extrude(amount=13.4, mode=Mode.PRIVATE)
    fillet1_piece_14 = fillet1_piece_14 & Plane(origin=(0, -87.841626629, 18), x_dir=(0.5817979794472398, 0, -0.8133333333333321), z_dir=(0, 1, 0)) * Cylinder(30, 39, mode=Mode.PRIVATE)
    add(fillet1_piece_14)
    with BuildSketch(Plane(origin=(-9.062148865, -62.850869682, -6.4), x_dir=(0.3690548403008551, -0.929407620396191, 0), z_dir=(0, 0, 1))) as fillet1_piece_15:
        with BuildLine():
            CenterArc((1.755309209, -4.986609194), FILLET1_R, 94.194237009, 34.148424345)
            Line((-1.346506739, -1.065035807), (0, 0))
            ThreePointArc((0, 0), (0.694809895, -0.025442532), (1.38961979, 0))
        make_face()
    extrude(amount=13.4)
    with BuildSketch(Plane(origin=(-3, -69.013878189, -6.4), x_dir=(-0.8991997125557425, 0.4375384291004277, 0), z_dir=(0, 0, 1))) as fillet1_piece_16:
        with BuildLine():
            CenterArc((3.14859528, 4.956785244), FILLET1_R, 205.946928397, 56.514623377)
            Line((-1.347403283, 2.769093098), (0, 0))
            ThreePointArc((0, 0), (1.246318965, 0.082108036), (2.49263793, 0))
        make_face()
    extrude(amount=13.4)
    with BuildSketch(Plane(origin=(3, -88.460607986, -6.4), x_dir=(0.9074530571156046, -0.42015348282686293, 0), z_dir=(0, 0, 1))) as fillet1_piece_17:
        with BuildLine():
            CenterArc((3.214124019, 4.958505447), FILLET1_R, 204.84427788, 57.769047364)
            Line((-1.323141267, 2.857738033), (0, 0))
            ThreePointArc((0, 0), (1.285649607, 0.082989105), (2.571299215, 0))
        make_face()
    extrude(amount=13.4)
    with BuildSketch(Plane(origin=(3, -69.013878189, -6.4), x_dir=(0.899199712555735, 0.43753842910044294, 0), z_dir=(0, 0, 1))) as fillet1_piece_18:
        with BuildLine():
            CenterArc((3.14859528, -4.956785244), FILLET1_R, 97.538448226, 56.514623377)
            Line((-1.347403283, -2.769093098), (0, 0))
            ThreePointArc((0, 0), (1.246318965, -0.082108036), (2.49263793, 0))
        make_face()
    extrude(amount=13.4)
    with BuildSketch(Plane(origin=(9.062148865, -62.850869682, -6.4), x_dir=(0.8660254037844507, 0.4999999999999791, 0), z_dir=(0, 0, 1))) as fillet1_piece_19:
        with BuildLine():
            CenterArc((1.716794009, -5), FILLET1_R, 90, 34.148424345)
            ThreePointArc((-1.089899198, -0.862068966), (-0.529165988, -0.450989434), (0, 0))
            Line((0, 0), (1.716794009, 0))
        make_face()
    extrude(amount=13.4)
    with BuildSketch(Plane(origin=(17.453939383, -58.005867167, -6.4), x_dir=(0, -1, 0), z_dir=(0, 0, 1))) as fillet1_piece_20_section:
        with BuildLine():
            CenterArc((FILLET1_R * 1.73205080757, -FILLET1_R), FILLET1_R, 90, 120)
            Line((FILLET1_R * 0.866025403784, -FILLET1_R * 1.5), (0, 0))
            Line((0, 0), (FILLET1_R * 1.73205080757, 0))
        make_face()
    fillet1_piece_20 = extrude(amount=13.4, mode=Mode.PRIVATE)
    fillet1_piece_20 = fillet1_piece_20 & Plane(origin=(0, -61.191165079, 18), x_dir=(0.5817979794472398, 0, -0.8133333333333321), z_dir=(0, 1, 0)) * Cylinder(30, 62, mode=Mode.PRIVATE)
    add(fillet1_piece_20)


solid = part.part
